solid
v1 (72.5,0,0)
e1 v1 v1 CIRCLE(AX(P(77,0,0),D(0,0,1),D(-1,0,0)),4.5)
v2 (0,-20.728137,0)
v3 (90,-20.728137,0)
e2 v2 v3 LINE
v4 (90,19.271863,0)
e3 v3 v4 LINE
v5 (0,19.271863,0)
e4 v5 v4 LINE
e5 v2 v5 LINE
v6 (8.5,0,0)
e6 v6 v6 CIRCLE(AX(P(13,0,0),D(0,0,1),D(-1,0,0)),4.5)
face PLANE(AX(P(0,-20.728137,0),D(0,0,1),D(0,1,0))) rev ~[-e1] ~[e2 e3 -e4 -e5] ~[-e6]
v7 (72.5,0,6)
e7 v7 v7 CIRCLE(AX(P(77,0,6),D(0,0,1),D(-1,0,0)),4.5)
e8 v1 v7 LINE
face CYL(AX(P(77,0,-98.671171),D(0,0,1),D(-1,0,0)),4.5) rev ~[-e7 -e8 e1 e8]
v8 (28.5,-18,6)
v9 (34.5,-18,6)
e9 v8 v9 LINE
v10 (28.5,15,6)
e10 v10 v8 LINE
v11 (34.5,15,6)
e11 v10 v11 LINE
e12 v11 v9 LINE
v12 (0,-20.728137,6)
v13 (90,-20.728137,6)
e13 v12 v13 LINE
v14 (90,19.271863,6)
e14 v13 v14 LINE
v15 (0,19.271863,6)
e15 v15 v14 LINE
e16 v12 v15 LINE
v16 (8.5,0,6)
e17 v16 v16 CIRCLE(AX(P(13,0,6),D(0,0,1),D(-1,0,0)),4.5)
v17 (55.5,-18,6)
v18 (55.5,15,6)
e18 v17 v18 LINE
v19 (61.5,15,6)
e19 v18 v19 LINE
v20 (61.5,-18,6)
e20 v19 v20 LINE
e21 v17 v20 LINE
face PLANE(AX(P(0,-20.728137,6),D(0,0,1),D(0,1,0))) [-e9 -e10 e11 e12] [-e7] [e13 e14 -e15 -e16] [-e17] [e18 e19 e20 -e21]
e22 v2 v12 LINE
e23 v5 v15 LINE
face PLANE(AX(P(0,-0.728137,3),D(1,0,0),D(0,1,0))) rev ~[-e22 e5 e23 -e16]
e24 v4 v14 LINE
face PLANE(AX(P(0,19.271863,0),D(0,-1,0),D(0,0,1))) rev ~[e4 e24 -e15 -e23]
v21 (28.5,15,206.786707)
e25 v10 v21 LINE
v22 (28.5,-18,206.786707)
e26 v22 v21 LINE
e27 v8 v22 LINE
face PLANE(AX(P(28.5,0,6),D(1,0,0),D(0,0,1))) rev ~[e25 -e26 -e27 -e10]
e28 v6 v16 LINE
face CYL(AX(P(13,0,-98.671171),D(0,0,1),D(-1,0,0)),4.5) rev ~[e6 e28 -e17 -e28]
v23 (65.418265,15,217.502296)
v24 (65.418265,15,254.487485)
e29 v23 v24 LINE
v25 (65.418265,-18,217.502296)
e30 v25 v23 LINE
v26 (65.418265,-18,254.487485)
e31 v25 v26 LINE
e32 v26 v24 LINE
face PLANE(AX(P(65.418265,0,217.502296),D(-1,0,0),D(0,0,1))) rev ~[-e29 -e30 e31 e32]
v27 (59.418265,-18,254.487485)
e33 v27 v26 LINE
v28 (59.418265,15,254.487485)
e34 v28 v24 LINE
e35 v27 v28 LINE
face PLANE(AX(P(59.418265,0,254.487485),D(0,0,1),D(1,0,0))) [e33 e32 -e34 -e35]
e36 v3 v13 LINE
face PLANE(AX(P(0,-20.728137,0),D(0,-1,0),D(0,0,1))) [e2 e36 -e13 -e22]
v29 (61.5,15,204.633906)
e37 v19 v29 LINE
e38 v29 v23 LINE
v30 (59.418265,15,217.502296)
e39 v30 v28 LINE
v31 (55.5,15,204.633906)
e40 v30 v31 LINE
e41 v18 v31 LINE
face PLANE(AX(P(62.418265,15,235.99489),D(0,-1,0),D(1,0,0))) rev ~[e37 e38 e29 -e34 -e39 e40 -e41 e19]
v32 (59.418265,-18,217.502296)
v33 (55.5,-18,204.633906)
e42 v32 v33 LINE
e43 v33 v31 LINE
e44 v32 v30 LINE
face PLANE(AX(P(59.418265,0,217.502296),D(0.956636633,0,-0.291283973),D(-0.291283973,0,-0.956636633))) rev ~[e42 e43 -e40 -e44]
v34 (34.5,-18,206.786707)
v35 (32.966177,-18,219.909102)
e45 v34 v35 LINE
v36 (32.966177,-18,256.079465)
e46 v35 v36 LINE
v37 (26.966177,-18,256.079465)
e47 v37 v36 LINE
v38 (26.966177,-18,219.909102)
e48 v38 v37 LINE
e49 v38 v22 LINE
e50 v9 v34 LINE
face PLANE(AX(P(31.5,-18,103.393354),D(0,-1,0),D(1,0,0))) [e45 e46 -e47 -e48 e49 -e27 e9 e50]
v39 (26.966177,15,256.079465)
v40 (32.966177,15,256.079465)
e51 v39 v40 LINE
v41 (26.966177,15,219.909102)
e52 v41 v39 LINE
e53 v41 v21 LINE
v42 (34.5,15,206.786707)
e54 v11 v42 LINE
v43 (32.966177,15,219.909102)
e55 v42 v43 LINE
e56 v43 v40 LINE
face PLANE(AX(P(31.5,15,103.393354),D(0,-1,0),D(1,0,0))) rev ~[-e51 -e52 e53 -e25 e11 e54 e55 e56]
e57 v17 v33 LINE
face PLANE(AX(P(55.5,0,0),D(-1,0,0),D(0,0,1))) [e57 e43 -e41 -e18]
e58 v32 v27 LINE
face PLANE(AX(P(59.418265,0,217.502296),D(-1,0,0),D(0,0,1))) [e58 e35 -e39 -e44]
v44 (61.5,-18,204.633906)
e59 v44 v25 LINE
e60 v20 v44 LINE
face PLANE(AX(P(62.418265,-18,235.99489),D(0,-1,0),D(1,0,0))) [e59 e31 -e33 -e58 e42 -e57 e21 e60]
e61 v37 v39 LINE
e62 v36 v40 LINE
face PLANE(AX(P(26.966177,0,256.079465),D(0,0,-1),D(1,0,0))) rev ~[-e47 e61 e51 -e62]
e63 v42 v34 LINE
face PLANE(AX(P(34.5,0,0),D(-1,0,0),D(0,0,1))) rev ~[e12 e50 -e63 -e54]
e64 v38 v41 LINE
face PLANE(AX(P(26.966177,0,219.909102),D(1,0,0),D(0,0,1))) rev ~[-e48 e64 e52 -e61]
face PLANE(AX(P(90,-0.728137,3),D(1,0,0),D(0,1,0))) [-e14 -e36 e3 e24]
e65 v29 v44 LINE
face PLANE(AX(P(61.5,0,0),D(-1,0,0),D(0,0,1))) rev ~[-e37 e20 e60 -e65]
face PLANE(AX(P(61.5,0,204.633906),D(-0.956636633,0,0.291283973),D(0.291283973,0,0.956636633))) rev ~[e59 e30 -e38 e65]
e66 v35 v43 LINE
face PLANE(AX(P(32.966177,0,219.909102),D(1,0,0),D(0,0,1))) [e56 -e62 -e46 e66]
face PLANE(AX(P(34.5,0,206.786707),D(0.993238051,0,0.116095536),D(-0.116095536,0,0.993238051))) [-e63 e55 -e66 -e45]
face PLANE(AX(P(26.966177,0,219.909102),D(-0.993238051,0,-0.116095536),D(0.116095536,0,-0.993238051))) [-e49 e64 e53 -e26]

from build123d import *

# Parameters (mm, degrees)
F0_W     = 40
F0_H     = 6
F1_DEPTH = 90
F4_D     = 9
F5_W     = 6
F5_H     = 36.9851887226
F5_H_2   = 204.6339064837
F5_H_3   = 206.7867070436
F5_H_4   = 36.1703634262
F6_DEPTH = 18
F7_DEPTH = 15


# Not quite as in the source:
# - a feature names something its author has since deleted; it is built from what else it names


with BuildPart() as f1:
    # F0 (on Right) → F1 (new body)
    with BuildSketch(Plane.YZ):
        with Locations((-0.72813743, 3)):
            Rectangle(F0_W, F0_H)
    extrude(amount=F1_DEPTH)

    # F4 (through all)
    with Locations(Plane(origin=(0, 0, 0), x_dir=(1, 0, 0), z_dir=(0, 0, -1))):
        with Locations((13, 0), (77, 0)):
            Hole(F4_D / 2)

    # F5 (on Front) → F6 (join)
    with BuildSketch(Plane.XZ):
        with Locations((62.4182647765, 235.9948903322)):
            Rectangle(F5_W, F5_H)
        Polygon((59.4182647765, 217.5022959709), (55.5, 204.6339064837), (61.5, 204.6339064837), (65.4182647765, 217.5022959709), align=None)
        with Locations((58.5, 102.3169532418)):
            Rectangle(F5_W, F5_H_2)
        with Locations((31.5, 103.3933535218)):
            Rectangle(F5_W, F5_H_3)
        Polygon((26.9661769271, 219.9091017246), (28.5, 206.7867070436), (34.5, 206.7867070436), (32.9661769271, 219.9091017246), align=None)
        with Locations((29.9661769271, 237.9942834377)):
            Rectangle(F5_W, F5_H_4)
    extrude(amount=F6_DEPTH)

    # F7 (add): faces of the model
    f7_faces = [f1.faces().sort_by_distance(p)[0] for p in [
        (31.2379126918, 0, 131.0397325754),
        (59.1846567788, 0, 130.2437423468),
    ]]
    extrude(f7_faces, amount=F7_DEPTH)


solid = f1.part
